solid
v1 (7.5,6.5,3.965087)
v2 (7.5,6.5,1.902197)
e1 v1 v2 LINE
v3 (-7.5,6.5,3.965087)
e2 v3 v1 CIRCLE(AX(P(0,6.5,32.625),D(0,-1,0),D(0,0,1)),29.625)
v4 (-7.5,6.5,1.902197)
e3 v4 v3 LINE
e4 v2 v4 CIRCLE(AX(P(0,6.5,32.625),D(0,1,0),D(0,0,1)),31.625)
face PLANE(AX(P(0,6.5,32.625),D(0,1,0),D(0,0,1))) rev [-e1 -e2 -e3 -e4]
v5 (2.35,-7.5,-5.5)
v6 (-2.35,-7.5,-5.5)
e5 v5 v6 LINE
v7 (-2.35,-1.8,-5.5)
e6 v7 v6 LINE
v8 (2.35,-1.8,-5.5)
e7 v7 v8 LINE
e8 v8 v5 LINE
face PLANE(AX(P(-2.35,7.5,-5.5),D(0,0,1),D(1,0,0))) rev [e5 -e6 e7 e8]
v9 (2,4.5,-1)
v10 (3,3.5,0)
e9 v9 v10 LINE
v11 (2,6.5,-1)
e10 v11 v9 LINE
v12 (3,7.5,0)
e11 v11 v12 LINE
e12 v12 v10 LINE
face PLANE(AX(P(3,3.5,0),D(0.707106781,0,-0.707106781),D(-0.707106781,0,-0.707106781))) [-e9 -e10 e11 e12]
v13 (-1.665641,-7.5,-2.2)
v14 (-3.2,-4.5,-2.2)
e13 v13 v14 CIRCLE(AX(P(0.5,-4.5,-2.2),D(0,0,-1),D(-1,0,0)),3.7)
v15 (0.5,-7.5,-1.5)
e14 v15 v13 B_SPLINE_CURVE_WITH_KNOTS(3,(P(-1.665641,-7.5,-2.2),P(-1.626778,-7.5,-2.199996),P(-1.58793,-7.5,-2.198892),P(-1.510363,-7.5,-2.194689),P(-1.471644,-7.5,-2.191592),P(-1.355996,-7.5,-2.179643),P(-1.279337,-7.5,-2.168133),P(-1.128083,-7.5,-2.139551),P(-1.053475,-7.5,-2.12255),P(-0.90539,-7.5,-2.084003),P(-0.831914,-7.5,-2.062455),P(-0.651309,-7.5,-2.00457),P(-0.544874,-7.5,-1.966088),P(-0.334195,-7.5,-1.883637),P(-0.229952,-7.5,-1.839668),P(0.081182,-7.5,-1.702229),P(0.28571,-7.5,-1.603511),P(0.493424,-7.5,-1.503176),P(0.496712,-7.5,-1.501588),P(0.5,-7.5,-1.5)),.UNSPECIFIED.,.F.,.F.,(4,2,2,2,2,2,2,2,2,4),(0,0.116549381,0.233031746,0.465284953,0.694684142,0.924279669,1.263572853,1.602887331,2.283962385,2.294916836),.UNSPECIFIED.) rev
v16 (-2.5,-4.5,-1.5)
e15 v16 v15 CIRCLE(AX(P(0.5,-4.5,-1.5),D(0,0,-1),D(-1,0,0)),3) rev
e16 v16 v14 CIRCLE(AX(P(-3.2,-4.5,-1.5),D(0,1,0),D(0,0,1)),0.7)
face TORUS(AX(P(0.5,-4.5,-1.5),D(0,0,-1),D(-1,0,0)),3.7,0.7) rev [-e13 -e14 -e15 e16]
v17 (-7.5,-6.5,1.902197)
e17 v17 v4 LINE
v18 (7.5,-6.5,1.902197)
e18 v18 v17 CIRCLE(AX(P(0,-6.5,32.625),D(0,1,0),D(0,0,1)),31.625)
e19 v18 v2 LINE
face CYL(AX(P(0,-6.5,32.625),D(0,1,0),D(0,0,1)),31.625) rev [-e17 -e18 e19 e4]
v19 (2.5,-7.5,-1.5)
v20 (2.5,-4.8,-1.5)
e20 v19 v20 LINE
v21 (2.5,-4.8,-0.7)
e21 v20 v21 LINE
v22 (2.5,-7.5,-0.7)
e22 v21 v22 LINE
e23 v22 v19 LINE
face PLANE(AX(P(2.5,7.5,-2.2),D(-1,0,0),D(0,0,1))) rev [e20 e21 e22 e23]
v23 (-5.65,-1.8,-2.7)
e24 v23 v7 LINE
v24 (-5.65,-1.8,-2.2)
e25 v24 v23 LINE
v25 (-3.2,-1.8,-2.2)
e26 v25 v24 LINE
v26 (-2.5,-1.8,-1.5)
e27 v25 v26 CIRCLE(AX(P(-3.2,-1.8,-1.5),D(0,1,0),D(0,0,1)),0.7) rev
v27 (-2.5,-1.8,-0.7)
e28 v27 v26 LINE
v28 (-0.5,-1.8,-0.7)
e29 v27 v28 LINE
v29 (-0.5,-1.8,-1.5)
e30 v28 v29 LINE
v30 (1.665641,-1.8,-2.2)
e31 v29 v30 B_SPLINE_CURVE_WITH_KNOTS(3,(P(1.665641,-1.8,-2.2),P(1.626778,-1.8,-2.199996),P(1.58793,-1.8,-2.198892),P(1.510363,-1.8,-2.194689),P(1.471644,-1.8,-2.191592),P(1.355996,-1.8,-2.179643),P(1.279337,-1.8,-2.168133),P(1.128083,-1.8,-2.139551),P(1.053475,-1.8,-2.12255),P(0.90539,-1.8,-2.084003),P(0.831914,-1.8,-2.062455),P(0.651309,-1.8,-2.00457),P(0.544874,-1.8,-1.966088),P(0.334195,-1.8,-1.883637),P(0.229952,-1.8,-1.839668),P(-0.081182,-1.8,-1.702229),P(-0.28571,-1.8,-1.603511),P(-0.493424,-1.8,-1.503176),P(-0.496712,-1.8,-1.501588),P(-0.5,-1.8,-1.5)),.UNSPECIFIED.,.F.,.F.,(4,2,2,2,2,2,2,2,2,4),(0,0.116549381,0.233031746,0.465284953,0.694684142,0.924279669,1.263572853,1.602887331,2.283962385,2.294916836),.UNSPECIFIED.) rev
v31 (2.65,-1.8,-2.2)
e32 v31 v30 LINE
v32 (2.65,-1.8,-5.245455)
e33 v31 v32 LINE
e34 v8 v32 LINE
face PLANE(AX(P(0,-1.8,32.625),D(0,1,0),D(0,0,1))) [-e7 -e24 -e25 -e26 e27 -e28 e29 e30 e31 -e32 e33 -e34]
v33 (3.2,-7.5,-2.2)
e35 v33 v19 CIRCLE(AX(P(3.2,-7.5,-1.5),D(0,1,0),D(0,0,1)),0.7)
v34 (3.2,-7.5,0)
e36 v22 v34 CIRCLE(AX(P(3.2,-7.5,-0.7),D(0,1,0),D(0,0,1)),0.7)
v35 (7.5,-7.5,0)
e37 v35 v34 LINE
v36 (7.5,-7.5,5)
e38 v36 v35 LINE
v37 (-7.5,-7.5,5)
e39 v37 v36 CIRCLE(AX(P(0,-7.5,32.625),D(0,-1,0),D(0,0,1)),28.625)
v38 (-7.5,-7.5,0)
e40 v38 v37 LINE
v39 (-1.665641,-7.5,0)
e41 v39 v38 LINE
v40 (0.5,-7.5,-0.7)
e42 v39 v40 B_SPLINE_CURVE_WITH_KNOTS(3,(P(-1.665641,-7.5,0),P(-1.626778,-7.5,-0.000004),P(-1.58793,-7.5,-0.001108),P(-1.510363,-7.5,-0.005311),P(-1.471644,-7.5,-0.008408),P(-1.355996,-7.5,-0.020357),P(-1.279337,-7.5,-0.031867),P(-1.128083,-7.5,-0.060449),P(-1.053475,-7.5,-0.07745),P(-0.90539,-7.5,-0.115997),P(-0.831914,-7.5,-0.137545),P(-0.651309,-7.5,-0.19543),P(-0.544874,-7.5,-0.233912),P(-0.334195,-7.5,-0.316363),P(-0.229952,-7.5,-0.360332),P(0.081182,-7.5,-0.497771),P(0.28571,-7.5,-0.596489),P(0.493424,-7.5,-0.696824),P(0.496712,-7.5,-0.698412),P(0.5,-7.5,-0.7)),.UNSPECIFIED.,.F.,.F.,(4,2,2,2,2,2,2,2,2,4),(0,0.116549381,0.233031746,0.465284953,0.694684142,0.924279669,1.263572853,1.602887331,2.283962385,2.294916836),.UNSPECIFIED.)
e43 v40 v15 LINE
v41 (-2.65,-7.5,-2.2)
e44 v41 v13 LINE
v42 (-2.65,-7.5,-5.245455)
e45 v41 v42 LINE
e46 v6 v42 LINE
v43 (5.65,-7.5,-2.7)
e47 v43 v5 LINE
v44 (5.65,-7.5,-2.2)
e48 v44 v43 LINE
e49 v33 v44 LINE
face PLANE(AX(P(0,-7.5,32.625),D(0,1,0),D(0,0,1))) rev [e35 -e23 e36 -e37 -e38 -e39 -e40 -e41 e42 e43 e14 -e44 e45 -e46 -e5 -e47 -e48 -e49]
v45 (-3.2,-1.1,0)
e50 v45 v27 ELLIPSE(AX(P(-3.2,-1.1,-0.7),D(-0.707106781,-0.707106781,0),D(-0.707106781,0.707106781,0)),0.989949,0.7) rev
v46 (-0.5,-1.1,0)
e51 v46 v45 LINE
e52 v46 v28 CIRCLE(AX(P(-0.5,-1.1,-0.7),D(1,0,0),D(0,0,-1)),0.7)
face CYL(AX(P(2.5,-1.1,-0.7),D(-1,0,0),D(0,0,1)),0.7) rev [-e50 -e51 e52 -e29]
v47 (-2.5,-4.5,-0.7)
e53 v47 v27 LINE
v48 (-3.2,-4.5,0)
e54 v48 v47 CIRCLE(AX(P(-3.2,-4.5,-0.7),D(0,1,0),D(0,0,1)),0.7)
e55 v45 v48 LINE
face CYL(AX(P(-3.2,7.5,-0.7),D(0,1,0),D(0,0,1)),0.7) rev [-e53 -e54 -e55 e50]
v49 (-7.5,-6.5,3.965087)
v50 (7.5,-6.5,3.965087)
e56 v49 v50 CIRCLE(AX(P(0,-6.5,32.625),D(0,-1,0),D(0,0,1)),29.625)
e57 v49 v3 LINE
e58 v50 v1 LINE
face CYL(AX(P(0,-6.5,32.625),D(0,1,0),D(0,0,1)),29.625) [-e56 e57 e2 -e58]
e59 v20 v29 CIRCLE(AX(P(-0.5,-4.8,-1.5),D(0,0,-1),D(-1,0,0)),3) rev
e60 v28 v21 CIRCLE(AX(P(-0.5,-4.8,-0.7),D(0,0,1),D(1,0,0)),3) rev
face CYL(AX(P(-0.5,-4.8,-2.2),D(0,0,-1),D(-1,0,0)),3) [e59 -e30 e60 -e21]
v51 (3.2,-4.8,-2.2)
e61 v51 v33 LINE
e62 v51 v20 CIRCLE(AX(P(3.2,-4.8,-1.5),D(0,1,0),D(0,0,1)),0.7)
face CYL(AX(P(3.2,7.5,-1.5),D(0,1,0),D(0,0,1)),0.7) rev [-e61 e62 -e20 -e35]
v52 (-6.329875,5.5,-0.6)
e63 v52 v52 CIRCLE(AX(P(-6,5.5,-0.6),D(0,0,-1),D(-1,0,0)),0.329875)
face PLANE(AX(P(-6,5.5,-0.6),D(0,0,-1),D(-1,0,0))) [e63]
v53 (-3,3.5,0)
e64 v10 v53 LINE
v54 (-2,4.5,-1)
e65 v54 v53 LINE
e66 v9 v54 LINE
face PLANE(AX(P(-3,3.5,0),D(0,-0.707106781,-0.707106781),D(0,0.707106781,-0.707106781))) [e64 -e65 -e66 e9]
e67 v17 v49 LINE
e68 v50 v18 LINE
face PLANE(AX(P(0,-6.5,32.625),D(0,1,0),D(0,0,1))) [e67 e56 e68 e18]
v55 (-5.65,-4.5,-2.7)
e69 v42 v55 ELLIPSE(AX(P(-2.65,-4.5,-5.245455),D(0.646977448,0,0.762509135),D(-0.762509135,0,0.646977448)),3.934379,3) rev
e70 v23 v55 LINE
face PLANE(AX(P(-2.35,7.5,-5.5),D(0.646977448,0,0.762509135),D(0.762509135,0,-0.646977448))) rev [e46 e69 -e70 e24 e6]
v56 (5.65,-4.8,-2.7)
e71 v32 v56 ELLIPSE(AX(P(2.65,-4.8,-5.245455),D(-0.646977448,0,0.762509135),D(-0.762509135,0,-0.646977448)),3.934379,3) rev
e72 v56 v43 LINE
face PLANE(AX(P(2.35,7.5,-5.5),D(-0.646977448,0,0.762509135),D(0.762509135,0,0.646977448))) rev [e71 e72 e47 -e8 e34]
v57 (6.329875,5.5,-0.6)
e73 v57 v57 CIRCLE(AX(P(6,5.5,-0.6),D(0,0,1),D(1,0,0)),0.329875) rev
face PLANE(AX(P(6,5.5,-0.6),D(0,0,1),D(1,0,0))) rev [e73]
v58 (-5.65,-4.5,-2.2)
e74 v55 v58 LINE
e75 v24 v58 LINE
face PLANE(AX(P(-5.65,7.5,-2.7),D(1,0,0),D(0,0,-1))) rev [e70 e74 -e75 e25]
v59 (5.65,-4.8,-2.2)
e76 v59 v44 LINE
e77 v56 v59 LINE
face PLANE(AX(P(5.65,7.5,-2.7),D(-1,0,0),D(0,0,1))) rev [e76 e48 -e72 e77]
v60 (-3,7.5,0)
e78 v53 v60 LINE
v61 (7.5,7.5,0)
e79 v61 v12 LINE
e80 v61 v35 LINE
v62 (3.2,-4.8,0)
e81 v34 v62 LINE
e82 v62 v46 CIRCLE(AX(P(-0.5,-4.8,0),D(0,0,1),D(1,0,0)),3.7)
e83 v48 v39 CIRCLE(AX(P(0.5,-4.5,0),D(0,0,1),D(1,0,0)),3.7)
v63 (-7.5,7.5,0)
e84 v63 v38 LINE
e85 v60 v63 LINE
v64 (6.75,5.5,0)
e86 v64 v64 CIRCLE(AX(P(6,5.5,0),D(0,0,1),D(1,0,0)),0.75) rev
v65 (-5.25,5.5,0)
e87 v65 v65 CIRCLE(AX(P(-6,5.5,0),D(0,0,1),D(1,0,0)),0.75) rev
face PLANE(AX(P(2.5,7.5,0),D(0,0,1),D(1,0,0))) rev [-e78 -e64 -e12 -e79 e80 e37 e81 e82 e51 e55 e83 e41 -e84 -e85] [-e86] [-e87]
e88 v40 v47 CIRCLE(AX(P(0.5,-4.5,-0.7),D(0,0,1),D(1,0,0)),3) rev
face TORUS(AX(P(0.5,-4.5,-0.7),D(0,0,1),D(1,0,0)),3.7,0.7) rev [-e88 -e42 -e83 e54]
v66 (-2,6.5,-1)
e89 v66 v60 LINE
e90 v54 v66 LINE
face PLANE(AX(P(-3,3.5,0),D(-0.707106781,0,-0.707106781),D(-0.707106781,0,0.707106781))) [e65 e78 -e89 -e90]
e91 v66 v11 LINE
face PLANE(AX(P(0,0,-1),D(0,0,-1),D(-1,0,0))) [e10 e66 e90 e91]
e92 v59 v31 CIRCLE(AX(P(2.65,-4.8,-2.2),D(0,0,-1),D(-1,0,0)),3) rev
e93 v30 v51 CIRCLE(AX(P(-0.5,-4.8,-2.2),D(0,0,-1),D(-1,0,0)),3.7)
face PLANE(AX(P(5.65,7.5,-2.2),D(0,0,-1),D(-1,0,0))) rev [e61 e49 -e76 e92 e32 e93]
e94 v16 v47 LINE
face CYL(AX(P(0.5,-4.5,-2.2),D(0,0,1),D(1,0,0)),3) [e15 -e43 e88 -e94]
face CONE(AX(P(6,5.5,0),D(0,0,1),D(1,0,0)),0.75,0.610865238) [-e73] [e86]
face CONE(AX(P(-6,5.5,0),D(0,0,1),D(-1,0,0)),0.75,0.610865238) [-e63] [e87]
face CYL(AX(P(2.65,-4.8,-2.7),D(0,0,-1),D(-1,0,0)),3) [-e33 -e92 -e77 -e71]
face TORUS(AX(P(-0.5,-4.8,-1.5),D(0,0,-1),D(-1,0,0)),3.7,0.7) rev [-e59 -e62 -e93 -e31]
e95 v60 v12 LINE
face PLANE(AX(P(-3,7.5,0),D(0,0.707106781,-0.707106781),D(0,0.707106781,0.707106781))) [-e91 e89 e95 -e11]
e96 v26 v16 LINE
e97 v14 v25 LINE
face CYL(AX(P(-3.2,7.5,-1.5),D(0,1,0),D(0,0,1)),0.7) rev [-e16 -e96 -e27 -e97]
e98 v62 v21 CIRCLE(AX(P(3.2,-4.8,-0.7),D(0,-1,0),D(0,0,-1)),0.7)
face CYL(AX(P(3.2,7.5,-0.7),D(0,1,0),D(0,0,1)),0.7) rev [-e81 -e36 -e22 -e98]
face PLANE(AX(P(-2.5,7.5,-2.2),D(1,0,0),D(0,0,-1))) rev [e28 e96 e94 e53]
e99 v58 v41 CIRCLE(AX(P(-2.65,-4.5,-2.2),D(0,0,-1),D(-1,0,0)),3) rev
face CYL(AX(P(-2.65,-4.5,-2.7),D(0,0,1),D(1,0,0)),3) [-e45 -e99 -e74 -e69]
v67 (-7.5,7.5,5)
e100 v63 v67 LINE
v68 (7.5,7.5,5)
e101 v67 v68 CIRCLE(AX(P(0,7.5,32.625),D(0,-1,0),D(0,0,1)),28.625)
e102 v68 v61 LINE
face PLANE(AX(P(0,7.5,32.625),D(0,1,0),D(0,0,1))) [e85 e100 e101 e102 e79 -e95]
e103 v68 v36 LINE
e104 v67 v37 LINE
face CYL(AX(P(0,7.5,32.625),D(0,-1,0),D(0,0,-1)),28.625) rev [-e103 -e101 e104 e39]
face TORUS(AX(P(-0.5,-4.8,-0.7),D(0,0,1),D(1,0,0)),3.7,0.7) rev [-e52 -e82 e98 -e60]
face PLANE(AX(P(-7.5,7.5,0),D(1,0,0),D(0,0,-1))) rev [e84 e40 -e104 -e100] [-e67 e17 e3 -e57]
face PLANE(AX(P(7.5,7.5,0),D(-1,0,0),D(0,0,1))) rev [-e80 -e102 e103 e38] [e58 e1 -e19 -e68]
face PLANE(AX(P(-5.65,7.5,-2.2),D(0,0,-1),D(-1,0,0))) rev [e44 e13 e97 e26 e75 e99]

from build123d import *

# Parameters (mm, degrees)
BOSS_EXTRUDE1_DEPTH           = 7.5
CUT_EXTRUDE2_DEPTH            = 9.3
FILLET1_R                     = 3
FILLET2_R                     = 0.7
SKETCH3_W                     = 6
SKETCH3_H                     = 4
BOSS_EXTRUDE2_DEPTH           = 1
BOSS_EXTRUDE2_TAPER           = 45
SKETCH5_R                     = 0.75
BOSS_EXTRUDE3_DEPTH           = 0.6
BOSS_EXTRUDE3_DRAFT           = 35
BOSS_EXTRUDE3_PROFILE_2_DEPTH = 0.6
BOSS_EXTRUDE3_PROFILE_2_DRAFT = 35
CUT_EXTRUDE3_DEPTH            = 6.5


with BuildPart() as part:
    # Sketch1 → Boss-Extrude1 (new, symmetric)
    with BuildSketch(Plane(origin=(0, 0, 0), x_dir=(1, 0, 0), z_dir=(0, 1, 0))):
        with BuildLine():
            Line((-2.35, 5.5), (2.35, 5.5))
            Line((2.35, 5.5), (5.65, 2.7))
            Line((5.65, 2.7), (5.65, 2.2))
            Line((5.65, 2.2), (2.5, 2.2))
            Line((2.5, 2.2), (2.5, 0))
            Line((2.5, 0), (7.5, 0))
            Line((7.5, 0), (7.5, -5))
            ThreePointArc((7.5, -5), (0, -4), (-7.5, -5))
            Line((-7.5, -5), (-7.5, 0))
            Line((-7.5, 0), (-2.5, 0))
            Line((-2.5, 0), (-2.5, 2.2))
            Line((-2.5, 2.2), (-5.65, 2.2))
            Line((-5.65, 2.2), (-5.65, 2.7))
            Line((-5.65, 2.7), (-2.35, 5.5))
        make_face()
    extrude(amount=BOSS_EXTRUDE1_DEPTH, both=True)

    # Sketch2 → Cut-Extrude2 (cut)
    with BuildSketch(Plane(origin=(0, 7.5, 0), x_dir=(1, 0, 0), z_dir=(0, 1, 0))):
        Polygon((-2.5, 0), (2.5, 0), (2.5, 2.2), (5.65, 2.2), (5.65, 2.7), (2.35, 5.5), (-2.35, 5.5), (-5.65, 2.7), (-5.65, 2.2), (-2.5, 2.2), align=None)
    extrude(amount=-CUT_EXTRUDE2_DEPTH, mode=Mode.SUBTRACT)

    # Fillet1
    fillet1_edges = [part.edges().sort_by_distance(p)[0] for p in [
        (-2.5, -7.5, -1.1),
        (-5.65, -7.5, -2.45),
        (5.65, -1.8, -2.45),
        (2.5, -1.8, -1.1),
    ]]
    fillet(fillet1_edges, radius=FILLET1_R)

    # Fillet2
    # the kernel refuses this fillet: 0.7 mm, written as the material it adds along each edge
    with BuildSketch(Plane(origin=(-2.5, -4.5, 0), x_dir=(0, 0, -1), z_dir=(0, 1, 0)), Plane(origin=(-2.5, -1.8, -2.2), x_dir=(0, 0, 1), z_dir=(0, -1, 0)), Plane(origin=(2.5, -4.8, -2.2), x_dir=(1, 0, 0), z_dir=(0, -1, 0)), Plane(origin=(2.5, -4.8, 0), x_dir=(0, 0, -1), z_dir=(0, -1, 0))) as fillet2_piece_1:
        with BuildLine():
            CenterArc((FILLET2_R, FILLET2_R), FILLET2_R, 180, 90)
            Line((0, FILLET2_R), (0, 0))
            Line((0, 0), (FILLET2_R, 0))
        make_face()
    extrude(amount=2.7)
    with BuildSketch(Plane(origin=(-2.5, -1.8, 0), x_dir=(0, 0, -1), z_dir=(1, 0, 0))) as fillet2_piece_2:
        with BuildLine():
            CenterArc((FILLET2_R, FILLET2_R), FILLET2_R, 180, 90)
            Line((0, FILLET2_R), (0, 0))
            Line((0, 0), (FILLET2_R, 0))
        make_face()
    extrude(amount=2)
    with BuildSketch(Plane(origin=(0.5, -4.5, 0), x_dir=(-1, 0, 0), z_dir=(0, 1, 0))) as fillet2_piece_3_section:
        with BuildLine():
            CenterArc((3 + FILLET2_R, -FILLET2_R), FILLET2_R, 90, 90)
            Line((3 + FILLET2_R, 0), (3, 0))
            Line((3, 0), (3, -FILLET2_R))
        make_face()
    fillet2_piece_3 = revolve(axis=Axis((0.5, -4.5, 0), (0, 0, 1)), revolution_arc=146.841139064, mode=Mode.PRIVATE)
    fillet2_piece_3 = split(fillet2_piece_3, bisect_by=Plane(origin=(2.5, -4.5, 0), z_dir=(-1, 0, 0)), keep=Keep.TOP, mode=Mode.PRIVATE)
    fillet2_piece_3 = split(fillet2_piece_3, bisect_by=Plane(origin=(0.5, -7.5, 0), z_dir=(0, 1, 0)), keep=Keep.TOP, mode=Mode.PRIVATE)
    add(fillet2_piece_3)
    with BuildSketch(Plane(origin=(0.5, -4.5, -2.2), x_dir=(-1, 0, 0), z_dir=(0, 1, 0))) as fillet2_piece_4_section:
        with BuildLine():
            CenterArc((3 + FILLET2_R, FILLET2_R), FILLET2_R, 180, 90)
            Line((3, FILLET2_R), (3, 0))
            Line((3, 0), (3 + FILLET2_R, 0))
        make_face()
    fillet2_piece_4 = revolve(axis=Axis((0.5, -4.5, -2.2), (0, 0, 1)), revolution_arc=146.841139064, mode=Mode.PRIVATE)
    fillet2_piece_4 = split(fillet2_piece_4, bisect_by=Plane(origin=(2.5, -4.5, -2.2), z_dir=(-1, 0, 0)), keep=Keep.TOP, mode=Mode.PRIVATE)
    fillet2_piece_4 = split(fillet2_piece_4, bisect_by=Plane(origin=(0.5, -7.5, -2.2), z_dir=(0, 1, 0)), keep=Keep.TOP, mode=Mode.PRIVATE)
    add(fillet2_piece_4)
    with BuildSketch(Plane(origin=(-0.5, -4.8, 0), x_dir=(1, 0, 0), z_dir=(0, -1, 0))) as fillet2_piece_5:
        with BuildLine():
            CenterArc((3 + FILLET2_R, -FILLET2_R), FILLET2_R, 90, 90)
            Line((3 + FILLET2_R, 0), (3, 0))
            Line((3, 0), (3, -FILLET2_R))
        make_face()
    revolve(axis=Axis((-0.5, -4.8, 0), (0, 0, 1)), revolution_arc=90)
    with BuildSketch(Plane(origin=(-0.5, -4.8, -2.2), x_dir=(1, 0, 0), z_dir=(0, -1, 0))) as fillet2_piece_6_section:
        with BuildLine():
            CenterArc((3 + FILLET2_R, FILLET2_R), FILLET2_R, 180, 90)
            Line((3, FILLET2_R), (3, 0))
            Line((3, 0), (3 + FILLET2_R, 0))
        make_face()
    fillet2_piece_6 = revolve(axis=Axis((-0.5, -4.8, -2.2), (0, 0, 1)), revolution_arc=146.841139064, mode=Mode.PRIVATE)
    fillet2_piece_6 = split(fillet2_piece_6, bisect_by=Plane(origin=(-2.5, -4.8, -2.2), z_dir=(1, 0, 0)), keep=Keep.TOP, mode=Mode.PRIVATE)
    fillet2_piece_6 = split(fillet2_piece_6, bisect_by=Plane(origin=(-0.5, -1.8, -2.2), z_dir=(0, -1, 0)), keep=Keep.TOP, mode=Mode.PRIVATE)
    add(fillet2_piece_6)
    with BuildSketch(Plane(origin=(-2.5, -4.5, 0), x_dir=(0, 0, -1), z_dir=(0, 1, 0))) as fillet2_piece_7a_section:
        with BuildLine():
            CenterArc((FILLET2_R, FILLET2_R), FILLET2_R, 180, 90)
            Line((0, FILLET2_R), (0, 0))
            Line((0, 0), (FILLET2_R, 0))
        make_face()
    fillet2_piece_7a = extrude(amount=4.45, mode=Mode.PRIVATE)
    fillet2_piece_7a = split(fillet2_piece_7a, bisect_by=Plane(origin=(-2.5, -1.8, 0), z_dir=(0, 1, 0)), keep=Keep.TOP, mode=Mode.PRIVATE)
    with BuildSketch(Plane(origin=(-4.25, -1.8, 0), x_dir=(0, 0, -1), z_dir=(1, 0, 0))) as fillet2_piece_7b_section:
        with BuildLine():
            CenterArc((FILLET2_R, FILLET2_R), FILLET2_R, 180, 90)
            Line((0, FILLET2_R), (0, 0))
            Line((0, 0), (FILLET2_R, 0))
        make_face()
    fillet2_piece_7b = extrude(amount=3.75, mode=Mode.PRIVATE)
    fillet2_piece_7b = split(fillet2_piece_7b, bisect_by=Plane(origin=(-2.5, -1.8, 0), z_dir=(-1, 0, 0)), keep=Keep.TOP, mode=Mode.PRIVATE)
    fillet2_piece_7 = fillet2_piece_7a & fillet2_piece_7b
    add(fillet2_piece_7)

    # Sketch3 → Boss-Extrude2 (add)
    with BuildSketch(Plane(origin=(0, 0, 0), x_dir=(-1, 0, 0), z_dir=(0, 0, -1))):
        with Locations((0, 5.5)):
            Rectangle(SKETCH3_W, SKETCH3_H)
    extrude(amount=BOSS_EXTRUDE2_DEPTH, taper=BOSS_EXTRUDE2_TAPER)


with BuildPart() as boss_extrude3_tool:
    # Sketch5 → Boss-Extrude3 (with draft: the straight prism first)
    with BuildSketch(Plane(origin=(0, 0, 0), x_dir=(-1, 0, 0), z_dir=(0, 0, -1))):
        with Locations((6, 5.5)):
            Circle(SKETCH5_R)
    extrude(amount=BOSS_EXTRUDE3_DEPTH)
    # Boss-Extrude3: the draft: its side faces are tilted about the plane it starts from
    boss_extrude3_sides = [boss_extrude3_tool.faces().sort_by_distance(p)[0] for p in [
        (-5.25, 5.5, -0.3),
    ]]
    draft(boss_extrude3_sides, Plane(origin=(0, 0, 0), x_dir=(-1, 0, 0), z_dir=(0, 0, -1)), BOSS_EXTRUDE3_DRAFT)


with BuildPart() as part_1:
    add(part.part)

    # Boss-Extrude3: add boss_extrude3_tool
    add(boss_extrude3_tool.part)


with BuildPart() as boss_extrude3_profile_2_tool:
    # Sketch5 → Boss-Extrude3 profile 2 (with draft: the straight prism first)
    with BuildSketch(Plane(origin=(0, 0, 0), x_dir=(-1, 0, 0), z_dir=(0, 0, -1))):
        with Locations((-6, 5.5)):
            Circle(SKETCH5_R)
    extrude(amount=BOSS_EXTRUDE3_PROFILE_2_DEPTH)
    # Boss-Extrude3 profile 2: the draft: its side faces are tilted about the plane it starts from
    boss_extrude3_profile_2_sides = [boss_extrude3_profile_2_tool.faces().sort_by_distance(p)[0] for p in [
        (6.75, 5.5, -0.3),
    ]]
    draft(boss_extrude3_profile_2_sides, Plane(origin=(0, 0, 0), x_dir=(-1, 0, 0), z_dir=(0, 0, -1)), BOSS_EXTRUDE3_PROFILE_2_DRAFT)


with BuildPart() as part_2:
    add(part_1.part)

    # Boss-Extrude3 profile 2: add boss_extrude3_profile_2_tool
    add(boss_extrude3_profile_2_tool.part)

    # Sketch6 → Cut-Extrude3 (cut, symmetric)
    with BuildSketch(Plane(origin=(0, 0, 0), x_dir=(1, 0, 0), z_dir=(0, 1, 0))):
        with BuildLine():
            Line((-7.5, -1.902196987), (-7.5, -3.965086794))
            ThreePointArc((-7.5, -3.965086794), (0, -3), (7.5, -3.965086794))
            Line((7.5, -3.965086794), (7.5, -1.902196987))
            ThreePointArc((7.5, -1.902196987), (0, -1), (-7.5, -1.902196987))
        make_face()
    extrude(amount=CUT_EXTRUDE3_DEPTH, both=True, mode=Mode.SUBTRACT)


solid = part_2.part
